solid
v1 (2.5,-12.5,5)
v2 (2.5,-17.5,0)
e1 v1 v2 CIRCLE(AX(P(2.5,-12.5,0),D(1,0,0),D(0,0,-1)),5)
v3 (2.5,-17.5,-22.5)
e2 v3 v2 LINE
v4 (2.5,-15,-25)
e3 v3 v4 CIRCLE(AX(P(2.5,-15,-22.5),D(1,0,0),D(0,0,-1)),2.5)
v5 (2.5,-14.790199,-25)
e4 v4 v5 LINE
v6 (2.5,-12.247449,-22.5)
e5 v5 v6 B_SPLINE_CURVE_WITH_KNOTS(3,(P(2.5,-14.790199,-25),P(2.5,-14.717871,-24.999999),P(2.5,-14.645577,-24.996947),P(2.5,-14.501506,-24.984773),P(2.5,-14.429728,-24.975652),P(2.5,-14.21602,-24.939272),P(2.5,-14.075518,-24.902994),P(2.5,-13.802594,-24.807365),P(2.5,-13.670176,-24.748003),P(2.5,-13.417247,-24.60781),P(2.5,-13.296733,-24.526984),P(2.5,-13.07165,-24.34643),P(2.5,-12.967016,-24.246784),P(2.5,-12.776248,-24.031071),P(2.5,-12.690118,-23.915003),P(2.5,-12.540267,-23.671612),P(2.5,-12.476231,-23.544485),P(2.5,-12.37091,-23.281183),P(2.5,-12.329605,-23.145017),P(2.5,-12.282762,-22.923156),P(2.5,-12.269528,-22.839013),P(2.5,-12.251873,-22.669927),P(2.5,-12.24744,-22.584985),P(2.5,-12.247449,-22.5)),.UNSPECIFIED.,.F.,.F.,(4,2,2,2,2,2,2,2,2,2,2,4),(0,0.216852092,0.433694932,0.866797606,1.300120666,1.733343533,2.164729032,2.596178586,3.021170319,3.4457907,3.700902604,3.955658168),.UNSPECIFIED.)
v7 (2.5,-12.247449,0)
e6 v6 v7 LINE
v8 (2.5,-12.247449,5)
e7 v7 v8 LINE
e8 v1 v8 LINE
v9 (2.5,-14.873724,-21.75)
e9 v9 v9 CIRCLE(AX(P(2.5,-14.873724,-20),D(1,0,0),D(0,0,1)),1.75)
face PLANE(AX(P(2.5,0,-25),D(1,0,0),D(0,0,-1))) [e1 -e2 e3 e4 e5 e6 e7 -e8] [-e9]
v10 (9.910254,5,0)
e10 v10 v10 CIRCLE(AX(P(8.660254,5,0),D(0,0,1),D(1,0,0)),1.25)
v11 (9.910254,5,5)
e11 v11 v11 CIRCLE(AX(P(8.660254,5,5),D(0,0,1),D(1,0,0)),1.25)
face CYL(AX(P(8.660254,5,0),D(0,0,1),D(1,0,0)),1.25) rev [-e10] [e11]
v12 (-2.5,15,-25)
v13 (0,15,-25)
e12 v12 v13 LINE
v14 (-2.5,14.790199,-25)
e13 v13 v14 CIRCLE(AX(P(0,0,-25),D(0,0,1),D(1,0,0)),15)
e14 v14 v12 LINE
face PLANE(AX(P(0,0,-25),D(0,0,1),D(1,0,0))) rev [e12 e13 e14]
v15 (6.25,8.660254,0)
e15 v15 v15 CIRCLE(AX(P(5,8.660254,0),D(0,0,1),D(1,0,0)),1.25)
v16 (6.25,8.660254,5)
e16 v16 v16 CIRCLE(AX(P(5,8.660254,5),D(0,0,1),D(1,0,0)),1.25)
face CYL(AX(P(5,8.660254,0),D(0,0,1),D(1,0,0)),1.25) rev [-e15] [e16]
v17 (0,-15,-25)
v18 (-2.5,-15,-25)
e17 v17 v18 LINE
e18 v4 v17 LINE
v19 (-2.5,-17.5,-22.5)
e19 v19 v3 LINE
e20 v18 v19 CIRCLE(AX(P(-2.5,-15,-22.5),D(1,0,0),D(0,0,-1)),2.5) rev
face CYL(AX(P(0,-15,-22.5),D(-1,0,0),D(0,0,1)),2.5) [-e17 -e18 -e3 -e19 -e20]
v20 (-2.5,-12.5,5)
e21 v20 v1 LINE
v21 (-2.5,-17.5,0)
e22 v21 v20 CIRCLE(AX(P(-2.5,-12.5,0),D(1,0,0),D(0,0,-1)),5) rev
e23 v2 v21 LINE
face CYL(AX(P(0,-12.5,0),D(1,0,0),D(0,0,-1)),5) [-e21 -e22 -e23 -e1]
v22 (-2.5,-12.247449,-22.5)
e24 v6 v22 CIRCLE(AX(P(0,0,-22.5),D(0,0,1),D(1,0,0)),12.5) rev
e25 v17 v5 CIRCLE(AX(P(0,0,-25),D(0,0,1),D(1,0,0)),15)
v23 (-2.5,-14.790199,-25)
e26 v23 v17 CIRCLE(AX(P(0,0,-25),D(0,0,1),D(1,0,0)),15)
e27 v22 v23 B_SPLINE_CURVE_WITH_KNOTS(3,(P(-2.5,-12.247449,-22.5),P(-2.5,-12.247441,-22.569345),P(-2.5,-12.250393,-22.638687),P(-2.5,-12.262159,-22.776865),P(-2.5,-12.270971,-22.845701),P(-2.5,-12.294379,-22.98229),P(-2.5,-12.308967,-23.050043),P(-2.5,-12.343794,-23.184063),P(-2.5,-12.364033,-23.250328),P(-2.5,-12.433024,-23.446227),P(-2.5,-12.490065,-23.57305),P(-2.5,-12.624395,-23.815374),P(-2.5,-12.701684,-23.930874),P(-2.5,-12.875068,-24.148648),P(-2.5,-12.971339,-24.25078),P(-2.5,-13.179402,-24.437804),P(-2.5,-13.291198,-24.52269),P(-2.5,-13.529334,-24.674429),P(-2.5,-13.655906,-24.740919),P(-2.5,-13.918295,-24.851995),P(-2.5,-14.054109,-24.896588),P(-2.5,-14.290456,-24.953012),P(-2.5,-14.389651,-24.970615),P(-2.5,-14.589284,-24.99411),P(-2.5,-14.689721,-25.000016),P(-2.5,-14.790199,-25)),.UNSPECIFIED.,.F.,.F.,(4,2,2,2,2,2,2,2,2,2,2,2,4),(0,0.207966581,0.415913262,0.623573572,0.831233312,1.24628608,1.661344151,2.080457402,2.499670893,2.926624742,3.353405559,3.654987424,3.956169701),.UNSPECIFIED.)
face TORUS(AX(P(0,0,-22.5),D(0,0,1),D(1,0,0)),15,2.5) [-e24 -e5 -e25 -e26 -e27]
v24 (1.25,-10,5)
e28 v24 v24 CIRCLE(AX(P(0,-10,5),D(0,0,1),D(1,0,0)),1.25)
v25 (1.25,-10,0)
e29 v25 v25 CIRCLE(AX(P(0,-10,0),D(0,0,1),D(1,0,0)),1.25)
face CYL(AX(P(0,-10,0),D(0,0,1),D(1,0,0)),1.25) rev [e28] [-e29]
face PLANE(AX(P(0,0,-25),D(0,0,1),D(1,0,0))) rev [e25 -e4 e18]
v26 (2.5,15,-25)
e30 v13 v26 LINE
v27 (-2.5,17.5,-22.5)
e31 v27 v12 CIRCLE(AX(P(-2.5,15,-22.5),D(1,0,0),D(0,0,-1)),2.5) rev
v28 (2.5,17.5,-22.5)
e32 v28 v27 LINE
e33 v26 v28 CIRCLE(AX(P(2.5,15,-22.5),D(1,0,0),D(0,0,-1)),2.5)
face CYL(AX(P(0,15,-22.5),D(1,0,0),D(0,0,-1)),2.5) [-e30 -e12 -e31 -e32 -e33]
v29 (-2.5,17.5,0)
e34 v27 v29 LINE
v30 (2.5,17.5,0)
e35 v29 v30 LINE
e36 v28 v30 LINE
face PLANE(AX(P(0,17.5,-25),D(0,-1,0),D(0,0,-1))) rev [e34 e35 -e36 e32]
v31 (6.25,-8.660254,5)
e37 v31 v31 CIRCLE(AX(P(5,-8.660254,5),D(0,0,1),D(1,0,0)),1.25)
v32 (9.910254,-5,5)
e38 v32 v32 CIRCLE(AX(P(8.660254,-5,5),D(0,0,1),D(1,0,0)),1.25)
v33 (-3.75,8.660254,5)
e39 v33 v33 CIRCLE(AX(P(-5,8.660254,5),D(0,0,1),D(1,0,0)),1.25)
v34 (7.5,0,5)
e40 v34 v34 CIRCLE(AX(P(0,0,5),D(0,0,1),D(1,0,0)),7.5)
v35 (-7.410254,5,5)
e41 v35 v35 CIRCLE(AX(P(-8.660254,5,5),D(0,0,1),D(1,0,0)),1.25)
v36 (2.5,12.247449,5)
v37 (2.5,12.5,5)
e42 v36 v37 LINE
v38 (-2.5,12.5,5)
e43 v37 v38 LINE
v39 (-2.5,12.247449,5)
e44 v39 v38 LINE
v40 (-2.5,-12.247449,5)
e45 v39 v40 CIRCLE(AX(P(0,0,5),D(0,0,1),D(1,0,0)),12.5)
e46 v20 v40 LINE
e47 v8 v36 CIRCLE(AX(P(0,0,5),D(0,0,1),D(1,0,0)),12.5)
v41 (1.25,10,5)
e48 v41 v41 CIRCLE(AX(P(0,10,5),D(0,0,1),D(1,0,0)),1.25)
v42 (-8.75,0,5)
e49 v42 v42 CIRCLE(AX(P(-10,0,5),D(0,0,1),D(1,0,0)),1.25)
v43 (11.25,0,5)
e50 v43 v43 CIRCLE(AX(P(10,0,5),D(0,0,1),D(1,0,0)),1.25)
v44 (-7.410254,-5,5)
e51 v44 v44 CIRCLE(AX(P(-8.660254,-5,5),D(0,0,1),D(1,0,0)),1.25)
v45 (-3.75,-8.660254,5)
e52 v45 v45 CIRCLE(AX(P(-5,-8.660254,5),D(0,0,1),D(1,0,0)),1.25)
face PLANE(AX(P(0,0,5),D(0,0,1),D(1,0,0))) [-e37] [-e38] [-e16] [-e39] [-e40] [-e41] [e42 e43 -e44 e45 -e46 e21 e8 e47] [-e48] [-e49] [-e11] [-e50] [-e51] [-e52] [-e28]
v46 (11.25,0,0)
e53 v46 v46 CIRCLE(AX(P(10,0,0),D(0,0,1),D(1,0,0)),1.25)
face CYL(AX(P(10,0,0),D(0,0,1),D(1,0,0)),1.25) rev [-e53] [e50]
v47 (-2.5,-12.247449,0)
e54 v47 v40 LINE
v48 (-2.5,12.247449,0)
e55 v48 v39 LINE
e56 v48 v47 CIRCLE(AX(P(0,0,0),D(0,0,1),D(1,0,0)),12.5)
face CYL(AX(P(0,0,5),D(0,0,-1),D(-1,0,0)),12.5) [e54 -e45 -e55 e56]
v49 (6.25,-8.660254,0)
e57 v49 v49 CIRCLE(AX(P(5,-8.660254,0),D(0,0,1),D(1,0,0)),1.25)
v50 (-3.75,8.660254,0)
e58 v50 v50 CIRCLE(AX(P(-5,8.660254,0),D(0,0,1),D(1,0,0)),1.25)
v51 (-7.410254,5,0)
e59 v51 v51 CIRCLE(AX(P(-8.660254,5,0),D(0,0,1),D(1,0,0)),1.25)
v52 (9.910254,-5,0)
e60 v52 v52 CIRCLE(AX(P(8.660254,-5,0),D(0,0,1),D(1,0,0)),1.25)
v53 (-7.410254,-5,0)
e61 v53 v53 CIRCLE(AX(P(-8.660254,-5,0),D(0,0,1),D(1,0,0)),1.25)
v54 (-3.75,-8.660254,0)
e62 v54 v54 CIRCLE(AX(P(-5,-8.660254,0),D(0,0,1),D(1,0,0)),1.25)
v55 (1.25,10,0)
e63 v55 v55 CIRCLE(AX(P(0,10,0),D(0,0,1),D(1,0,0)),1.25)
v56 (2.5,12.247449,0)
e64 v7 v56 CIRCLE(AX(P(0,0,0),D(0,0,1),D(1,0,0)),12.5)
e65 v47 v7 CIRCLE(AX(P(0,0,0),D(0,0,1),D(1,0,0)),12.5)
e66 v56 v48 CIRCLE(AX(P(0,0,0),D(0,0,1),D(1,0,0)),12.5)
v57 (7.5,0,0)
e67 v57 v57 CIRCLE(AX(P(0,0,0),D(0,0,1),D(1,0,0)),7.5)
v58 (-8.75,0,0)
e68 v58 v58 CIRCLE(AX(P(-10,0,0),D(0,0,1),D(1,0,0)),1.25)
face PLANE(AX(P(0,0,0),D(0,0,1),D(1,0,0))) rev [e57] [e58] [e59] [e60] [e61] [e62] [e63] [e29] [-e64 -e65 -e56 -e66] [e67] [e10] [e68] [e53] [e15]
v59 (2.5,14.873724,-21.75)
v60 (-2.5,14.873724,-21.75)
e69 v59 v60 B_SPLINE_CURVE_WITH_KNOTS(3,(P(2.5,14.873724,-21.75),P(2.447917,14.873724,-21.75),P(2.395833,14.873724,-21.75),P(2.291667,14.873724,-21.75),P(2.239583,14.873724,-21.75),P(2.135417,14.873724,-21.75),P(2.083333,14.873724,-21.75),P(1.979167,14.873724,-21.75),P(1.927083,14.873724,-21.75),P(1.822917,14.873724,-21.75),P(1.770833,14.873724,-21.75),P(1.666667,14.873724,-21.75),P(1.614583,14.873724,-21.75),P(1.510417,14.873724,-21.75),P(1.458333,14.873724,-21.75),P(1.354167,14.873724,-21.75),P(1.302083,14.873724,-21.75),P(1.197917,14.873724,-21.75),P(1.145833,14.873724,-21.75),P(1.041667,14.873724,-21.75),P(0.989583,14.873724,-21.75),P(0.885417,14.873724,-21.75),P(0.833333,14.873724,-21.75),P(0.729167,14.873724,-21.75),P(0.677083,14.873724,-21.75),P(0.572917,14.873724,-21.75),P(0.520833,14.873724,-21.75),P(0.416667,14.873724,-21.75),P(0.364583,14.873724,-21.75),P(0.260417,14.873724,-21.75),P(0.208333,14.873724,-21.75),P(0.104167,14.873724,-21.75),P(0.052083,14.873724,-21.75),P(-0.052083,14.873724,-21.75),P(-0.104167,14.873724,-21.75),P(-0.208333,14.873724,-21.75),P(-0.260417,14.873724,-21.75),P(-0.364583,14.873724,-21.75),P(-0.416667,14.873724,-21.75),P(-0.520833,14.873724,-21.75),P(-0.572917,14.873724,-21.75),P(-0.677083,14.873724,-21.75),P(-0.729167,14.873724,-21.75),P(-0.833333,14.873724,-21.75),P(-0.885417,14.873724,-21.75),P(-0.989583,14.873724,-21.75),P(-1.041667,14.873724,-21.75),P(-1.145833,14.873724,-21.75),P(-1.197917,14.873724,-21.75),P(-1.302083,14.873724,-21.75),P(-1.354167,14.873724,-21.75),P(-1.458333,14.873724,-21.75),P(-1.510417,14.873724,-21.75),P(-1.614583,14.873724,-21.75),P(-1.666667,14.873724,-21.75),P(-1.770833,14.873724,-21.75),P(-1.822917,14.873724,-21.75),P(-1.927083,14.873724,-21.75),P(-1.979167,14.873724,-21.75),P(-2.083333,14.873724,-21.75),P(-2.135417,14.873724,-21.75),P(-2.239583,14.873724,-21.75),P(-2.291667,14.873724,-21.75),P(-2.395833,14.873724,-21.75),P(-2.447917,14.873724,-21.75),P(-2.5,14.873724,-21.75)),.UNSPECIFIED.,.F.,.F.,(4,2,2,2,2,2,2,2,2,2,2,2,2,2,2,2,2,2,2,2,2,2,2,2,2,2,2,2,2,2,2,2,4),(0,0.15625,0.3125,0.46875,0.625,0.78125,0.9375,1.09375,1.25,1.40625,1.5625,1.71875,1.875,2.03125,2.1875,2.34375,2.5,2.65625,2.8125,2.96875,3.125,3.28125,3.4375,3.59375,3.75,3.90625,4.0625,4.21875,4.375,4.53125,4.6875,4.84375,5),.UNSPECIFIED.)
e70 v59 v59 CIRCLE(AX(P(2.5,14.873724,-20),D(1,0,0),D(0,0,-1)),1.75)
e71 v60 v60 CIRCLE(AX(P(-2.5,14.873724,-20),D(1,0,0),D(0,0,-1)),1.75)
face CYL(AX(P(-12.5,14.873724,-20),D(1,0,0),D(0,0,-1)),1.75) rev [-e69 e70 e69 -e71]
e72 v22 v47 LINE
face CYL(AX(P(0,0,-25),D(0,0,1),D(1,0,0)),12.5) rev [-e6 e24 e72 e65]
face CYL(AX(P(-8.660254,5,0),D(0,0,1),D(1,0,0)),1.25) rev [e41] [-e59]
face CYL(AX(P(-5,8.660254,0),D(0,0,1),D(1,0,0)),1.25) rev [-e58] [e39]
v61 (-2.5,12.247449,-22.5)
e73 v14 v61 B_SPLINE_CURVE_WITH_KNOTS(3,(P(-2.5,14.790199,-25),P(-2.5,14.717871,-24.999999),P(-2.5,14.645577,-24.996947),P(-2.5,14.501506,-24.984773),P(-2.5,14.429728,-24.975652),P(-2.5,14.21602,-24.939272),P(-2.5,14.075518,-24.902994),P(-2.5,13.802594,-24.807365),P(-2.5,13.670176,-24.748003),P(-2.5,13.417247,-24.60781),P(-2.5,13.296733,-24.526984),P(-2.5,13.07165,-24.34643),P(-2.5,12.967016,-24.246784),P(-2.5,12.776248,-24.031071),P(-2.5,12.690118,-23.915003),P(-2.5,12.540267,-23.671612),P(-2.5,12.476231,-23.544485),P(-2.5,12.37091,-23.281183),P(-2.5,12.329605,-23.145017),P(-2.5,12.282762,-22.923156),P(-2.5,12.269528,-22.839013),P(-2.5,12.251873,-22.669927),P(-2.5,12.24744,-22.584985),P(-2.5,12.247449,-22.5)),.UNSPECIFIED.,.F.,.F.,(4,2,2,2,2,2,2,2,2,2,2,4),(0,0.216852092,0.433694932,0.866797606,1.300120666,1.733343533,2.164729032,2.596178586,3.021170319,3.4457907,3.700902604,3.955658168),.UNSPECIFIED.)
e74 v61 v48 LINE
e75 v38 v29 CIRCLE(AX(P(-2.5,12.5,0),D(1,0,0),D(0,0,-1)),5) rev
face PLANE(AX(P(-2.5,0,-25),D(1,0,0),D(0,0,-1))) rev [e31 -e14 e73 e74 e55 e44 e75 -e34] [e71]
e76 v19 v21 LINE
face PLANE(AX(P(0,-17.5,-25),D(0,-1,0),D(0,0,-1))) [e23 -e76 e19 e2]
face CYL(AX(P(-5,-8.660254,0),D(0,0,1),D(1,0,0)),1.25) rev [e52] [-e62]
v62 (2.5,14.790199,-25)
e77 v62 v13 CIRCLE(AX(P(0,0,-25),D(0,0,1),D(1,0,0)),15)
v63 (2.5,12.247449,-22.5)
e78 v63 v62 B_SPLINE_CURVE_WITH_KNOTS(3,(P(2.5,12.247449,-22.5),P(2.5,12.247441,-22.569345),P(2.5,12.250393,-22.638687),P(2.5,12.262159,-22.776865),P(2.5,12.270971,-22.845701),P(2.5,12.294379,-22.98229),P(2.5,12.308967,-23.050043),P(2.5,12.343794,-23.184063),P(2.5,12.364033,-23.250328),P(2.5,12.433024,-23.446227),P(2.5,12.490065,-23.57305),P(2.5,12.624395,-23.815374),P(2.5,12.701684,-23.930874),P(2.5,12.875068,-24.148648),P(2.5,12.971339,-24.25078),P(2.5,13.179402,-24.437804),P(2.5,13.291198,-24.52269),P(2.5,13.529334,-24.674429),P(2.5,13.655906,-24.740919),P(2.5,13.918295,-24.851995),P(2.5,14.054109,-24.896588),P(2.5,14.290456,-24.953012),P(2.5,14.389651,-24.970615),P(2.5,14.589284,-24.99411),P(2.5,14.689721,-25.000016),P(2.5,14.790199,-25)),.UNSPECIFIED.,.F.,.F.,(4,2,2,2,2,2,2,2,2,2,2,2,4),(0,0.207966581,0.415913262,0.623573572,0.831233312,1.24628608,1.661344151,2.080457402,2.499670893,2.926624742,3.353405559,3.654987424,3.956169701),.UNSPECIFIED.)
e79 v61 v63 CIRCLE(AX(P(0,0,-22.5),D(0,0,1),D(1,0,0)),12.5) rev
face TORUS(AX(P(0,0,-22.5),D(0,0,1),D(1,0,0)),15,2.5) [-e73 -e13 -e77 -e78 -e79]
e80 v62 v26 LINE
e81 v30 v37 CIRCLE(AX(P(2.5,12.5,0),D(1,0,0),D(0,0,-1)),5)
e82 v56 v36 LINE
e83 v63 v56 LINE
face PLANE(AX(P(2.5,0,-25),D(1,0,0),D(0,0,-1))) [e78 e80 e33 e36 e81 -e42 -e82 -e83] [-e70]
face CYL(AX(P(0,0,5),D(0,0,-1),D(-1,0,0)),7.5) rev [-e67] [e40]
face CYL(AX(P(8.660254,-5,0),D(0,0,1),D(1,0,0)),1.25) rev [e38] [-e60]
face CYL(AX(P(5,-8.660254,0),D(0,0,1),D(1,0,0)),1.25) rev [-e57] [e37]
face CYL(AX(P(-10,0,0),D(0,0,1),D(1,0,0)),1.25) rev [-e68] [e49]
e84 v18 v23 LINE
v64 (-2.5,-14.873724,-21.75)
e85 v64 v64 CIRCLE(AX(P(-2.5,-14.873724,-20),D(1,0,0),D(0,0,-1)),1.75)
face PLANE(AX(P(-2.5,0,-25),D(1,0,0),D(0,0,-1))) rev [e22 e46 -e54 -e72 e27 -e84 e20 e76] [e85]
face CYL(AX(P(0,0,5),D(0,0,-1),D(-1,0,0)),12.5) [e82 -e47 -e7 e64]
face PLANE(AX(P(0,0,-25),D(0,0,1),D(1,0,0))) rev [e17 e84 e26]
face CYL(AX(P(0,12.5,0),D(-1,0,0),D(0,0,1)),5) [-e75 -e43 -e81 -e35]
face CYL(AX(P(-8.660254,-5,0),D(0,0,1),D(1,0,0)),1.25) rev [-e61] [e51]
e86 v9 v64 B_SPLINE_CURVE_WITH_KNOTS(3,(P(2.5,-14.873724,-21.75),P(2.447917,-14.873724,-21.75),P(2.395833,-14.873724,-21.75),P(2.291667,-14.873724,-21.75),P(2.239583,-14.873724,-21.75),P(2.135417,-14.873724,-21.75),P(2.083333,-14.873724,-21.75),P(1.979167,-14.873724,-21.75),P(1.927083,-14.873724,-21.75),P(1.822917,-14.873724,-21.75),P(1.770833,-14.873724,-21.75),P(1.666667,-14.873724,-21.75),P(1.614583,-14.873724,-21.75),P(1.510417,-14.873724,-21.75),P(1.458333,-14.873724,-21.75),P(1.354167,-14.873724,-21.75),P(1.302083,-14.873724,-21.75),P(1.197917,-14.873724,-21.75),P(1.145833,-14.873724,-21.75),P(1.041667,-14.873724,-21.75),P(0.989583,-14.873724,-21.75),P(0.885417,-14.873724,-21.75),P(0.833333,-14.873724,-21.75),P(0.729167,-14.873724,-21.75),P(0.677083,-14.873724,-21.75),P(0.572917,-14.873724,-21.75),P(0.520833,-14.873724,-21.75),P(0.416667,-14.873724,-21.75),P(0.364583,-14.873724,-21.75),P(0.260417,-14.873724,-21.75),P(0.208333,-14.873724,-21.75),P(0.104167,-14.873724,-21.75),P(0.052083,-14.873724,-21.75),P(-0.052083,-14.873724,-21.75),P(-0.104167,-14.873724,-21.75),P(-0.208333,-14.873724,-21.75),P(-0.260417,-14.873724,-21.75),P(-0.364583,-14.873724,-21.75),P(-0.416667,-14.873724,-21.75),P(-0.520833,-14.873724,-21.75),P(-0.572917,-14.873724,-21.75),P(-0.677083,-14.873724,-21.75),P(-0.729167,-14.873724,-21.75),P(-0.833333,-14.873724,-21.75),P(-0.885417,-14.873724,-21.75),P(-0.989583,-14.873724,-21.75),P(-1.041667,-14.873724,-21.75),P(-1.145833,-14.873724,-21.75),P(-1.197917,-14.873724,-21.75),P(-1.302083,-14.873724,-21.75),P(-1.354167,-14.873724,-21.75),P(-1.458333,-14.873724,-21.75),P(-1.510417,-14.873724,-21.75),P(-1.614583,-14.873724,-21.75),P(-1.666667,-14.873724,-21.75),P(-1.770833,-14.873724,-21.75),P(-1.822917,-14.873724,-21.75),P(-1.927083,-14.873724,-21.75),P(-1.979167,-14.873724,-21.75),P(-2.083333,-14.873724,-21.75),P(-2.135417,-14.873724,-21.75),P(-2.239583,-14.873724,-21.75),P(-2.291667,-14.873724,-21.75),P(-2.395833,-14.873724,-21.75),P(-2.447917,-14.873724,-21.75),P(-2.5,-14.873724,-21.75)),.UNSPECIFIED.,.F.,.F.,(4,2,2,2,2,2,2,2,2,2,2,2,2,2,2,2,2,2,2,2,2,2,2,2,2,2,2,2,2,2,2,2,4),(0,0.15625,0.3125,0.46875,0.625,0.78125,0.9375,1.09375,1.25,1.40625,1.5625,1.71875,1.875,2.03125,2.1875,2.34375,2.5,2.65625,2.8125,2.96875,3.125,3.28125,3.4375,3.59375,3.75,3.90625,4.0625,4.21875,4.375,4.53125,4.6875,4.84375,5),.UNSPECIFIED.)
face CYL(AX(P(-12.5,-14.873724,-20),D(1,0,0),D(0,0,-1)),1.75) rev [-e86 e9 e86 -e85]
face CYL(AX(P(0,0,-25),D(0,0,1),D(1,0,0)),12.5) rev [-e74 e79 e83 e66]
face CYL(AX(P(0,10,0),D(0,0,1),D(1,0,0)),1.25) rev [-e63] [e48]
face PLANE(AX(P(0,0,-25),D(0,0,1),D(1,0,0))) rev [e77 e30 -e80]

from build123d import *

# Parameters (mm, degrees)
SKETCH1_R           = 12.5
SKETCH1_R_2         = 7.5
BOSS_EXTRUDE1_DEPTH = 5
SKETCH3_R           = 1.25
CUT_EXTRUDE1_DEPTH  = 5
BOSS_EXTRUDE2_START = -30
BOSS_EXTRUDE2_DEPTH = 30
SKETCH6_R           = 1.75
CUT_EXTRUDE2_DEPTH  = 35.003676272
FILLET1_R           = 5
FILLET2_R           = 2.5


with BuildPart() as part:
    # Sketch1 → Boss-Extrude1 (new body)
    with BuildSketch(Plane.XY):
        Circle(SKETCH1_R)
        Circle(SKETCH1_R_2, mode=Mode.SUBTRACT)
    extrude(amount=BOSS_EXTRUDE1_DEPTH)

    # Sketch3 → Cut-Extrude1 (cut)
    with BuildSketch(Plane.XY.offset(5)):
        with Locations((0, 10)):
            Circle(SKETCH3_R)
        with Locations((5, 8.660254038)):
            Circle(SKETCH3_R)
        with Locations((8.660254038, 5)):
            Circle(SKETCH3_R)
        with Locations((10, 0)):
            Circle(SKETCH3_R)
        with Locations((8.660254038, -5)):
            Circle(SKETCH3_R)
        with Locations((5, -8.660254038)):
            Circle(SKETCH3_R)
        with Locations((0, -10)):
            Circle(SKETCH3_R)
        with Locations((-5, -8.660254038)):
            Circle(SKETCH3_R)
        with Locations((-8.660254038, -5)):
            Circle(SKETCH3_R)
        with Locations((-10, 0)):
            Circle(SKETCH3_R)
        with Locations((-8.660254038, 5)):
            Circle(SKETCH3_R)
        with Locations((-5, 8.660254038)):
            Circle(SKETCH3_R)
    extrude(amount=-CUT_EXTRUDE1_DEPTH, mode=Mode.SUBTRACT)

    # Sketch4 → Boss-Extrude2 (add)
    with BuildSketch(Plane.XY.offset(5).offset(BOSS_EXTRUDE2_START)):
        with BuildLine():
            Line((-2.5, 17.5), (-2.5, 12.247448714))
            ThreePointArc((-2.5, 12.247448714), (0, 12.5), (2.5, 12.247448714))
            Line((2.5, 12.247448714), (2.5, 17.5))
            Line((2.5, 17.5), (-2.5, 17.5))
        make_face()
        with BuildLine():
            Line((-2.5, -12.247448714), (-2.5, -17.5))
            Line((-2.5, -17.5), (2.5, -17.5))
            Line((2.5, -17.5), (2.5, -12.247448714))
            ThreePointArc((2.5, -12.247448714), (0, -12.5), (-2.5, -12.247448714))
        make_face()
    extrude(amount=BOSS_EXTRUDE2_DEPTH)

    # Sketch6 → Cut-Extrude2 (cut, through all)
    with BuildSketch(Plane(origin=(2.5, 0, 0), x_dir=(0, 0, -1), z_dir=(1, 0, 0))):
        with Locations((20, 14.873724357)):
            Circle(SKETCH6_R)
        with Locations((20, -14.873724357)):
            Circle(SKETCH6_R)
    extrude(amount=-CUT_EXTRUDE2_DEPTH, mode=Mode.SUBTRACT)

    # Fillet1
    fillet1_edges = [part.edges().sort_by_distance(p)[0] for p in [
        (0, 17.5, 5),
        (0, -17.5, 5),
    ]]
    fillet(fillet1_edges, radius=FILLET1_R)

    # Fillet2
    fillet2_edges = [part.edges().sort_by_distance(p)[0] for p in [
        (0, 12.5, -25),
        (0, 17.5, -25),
        (0, -17.5, -25),
        (0, -12.5, -25),
    ]]
    fillet(fillet2_edges, radius=FILLET2_R - 0.0001)  # a hair under: the kernel refuses the full size


solid = part.part
